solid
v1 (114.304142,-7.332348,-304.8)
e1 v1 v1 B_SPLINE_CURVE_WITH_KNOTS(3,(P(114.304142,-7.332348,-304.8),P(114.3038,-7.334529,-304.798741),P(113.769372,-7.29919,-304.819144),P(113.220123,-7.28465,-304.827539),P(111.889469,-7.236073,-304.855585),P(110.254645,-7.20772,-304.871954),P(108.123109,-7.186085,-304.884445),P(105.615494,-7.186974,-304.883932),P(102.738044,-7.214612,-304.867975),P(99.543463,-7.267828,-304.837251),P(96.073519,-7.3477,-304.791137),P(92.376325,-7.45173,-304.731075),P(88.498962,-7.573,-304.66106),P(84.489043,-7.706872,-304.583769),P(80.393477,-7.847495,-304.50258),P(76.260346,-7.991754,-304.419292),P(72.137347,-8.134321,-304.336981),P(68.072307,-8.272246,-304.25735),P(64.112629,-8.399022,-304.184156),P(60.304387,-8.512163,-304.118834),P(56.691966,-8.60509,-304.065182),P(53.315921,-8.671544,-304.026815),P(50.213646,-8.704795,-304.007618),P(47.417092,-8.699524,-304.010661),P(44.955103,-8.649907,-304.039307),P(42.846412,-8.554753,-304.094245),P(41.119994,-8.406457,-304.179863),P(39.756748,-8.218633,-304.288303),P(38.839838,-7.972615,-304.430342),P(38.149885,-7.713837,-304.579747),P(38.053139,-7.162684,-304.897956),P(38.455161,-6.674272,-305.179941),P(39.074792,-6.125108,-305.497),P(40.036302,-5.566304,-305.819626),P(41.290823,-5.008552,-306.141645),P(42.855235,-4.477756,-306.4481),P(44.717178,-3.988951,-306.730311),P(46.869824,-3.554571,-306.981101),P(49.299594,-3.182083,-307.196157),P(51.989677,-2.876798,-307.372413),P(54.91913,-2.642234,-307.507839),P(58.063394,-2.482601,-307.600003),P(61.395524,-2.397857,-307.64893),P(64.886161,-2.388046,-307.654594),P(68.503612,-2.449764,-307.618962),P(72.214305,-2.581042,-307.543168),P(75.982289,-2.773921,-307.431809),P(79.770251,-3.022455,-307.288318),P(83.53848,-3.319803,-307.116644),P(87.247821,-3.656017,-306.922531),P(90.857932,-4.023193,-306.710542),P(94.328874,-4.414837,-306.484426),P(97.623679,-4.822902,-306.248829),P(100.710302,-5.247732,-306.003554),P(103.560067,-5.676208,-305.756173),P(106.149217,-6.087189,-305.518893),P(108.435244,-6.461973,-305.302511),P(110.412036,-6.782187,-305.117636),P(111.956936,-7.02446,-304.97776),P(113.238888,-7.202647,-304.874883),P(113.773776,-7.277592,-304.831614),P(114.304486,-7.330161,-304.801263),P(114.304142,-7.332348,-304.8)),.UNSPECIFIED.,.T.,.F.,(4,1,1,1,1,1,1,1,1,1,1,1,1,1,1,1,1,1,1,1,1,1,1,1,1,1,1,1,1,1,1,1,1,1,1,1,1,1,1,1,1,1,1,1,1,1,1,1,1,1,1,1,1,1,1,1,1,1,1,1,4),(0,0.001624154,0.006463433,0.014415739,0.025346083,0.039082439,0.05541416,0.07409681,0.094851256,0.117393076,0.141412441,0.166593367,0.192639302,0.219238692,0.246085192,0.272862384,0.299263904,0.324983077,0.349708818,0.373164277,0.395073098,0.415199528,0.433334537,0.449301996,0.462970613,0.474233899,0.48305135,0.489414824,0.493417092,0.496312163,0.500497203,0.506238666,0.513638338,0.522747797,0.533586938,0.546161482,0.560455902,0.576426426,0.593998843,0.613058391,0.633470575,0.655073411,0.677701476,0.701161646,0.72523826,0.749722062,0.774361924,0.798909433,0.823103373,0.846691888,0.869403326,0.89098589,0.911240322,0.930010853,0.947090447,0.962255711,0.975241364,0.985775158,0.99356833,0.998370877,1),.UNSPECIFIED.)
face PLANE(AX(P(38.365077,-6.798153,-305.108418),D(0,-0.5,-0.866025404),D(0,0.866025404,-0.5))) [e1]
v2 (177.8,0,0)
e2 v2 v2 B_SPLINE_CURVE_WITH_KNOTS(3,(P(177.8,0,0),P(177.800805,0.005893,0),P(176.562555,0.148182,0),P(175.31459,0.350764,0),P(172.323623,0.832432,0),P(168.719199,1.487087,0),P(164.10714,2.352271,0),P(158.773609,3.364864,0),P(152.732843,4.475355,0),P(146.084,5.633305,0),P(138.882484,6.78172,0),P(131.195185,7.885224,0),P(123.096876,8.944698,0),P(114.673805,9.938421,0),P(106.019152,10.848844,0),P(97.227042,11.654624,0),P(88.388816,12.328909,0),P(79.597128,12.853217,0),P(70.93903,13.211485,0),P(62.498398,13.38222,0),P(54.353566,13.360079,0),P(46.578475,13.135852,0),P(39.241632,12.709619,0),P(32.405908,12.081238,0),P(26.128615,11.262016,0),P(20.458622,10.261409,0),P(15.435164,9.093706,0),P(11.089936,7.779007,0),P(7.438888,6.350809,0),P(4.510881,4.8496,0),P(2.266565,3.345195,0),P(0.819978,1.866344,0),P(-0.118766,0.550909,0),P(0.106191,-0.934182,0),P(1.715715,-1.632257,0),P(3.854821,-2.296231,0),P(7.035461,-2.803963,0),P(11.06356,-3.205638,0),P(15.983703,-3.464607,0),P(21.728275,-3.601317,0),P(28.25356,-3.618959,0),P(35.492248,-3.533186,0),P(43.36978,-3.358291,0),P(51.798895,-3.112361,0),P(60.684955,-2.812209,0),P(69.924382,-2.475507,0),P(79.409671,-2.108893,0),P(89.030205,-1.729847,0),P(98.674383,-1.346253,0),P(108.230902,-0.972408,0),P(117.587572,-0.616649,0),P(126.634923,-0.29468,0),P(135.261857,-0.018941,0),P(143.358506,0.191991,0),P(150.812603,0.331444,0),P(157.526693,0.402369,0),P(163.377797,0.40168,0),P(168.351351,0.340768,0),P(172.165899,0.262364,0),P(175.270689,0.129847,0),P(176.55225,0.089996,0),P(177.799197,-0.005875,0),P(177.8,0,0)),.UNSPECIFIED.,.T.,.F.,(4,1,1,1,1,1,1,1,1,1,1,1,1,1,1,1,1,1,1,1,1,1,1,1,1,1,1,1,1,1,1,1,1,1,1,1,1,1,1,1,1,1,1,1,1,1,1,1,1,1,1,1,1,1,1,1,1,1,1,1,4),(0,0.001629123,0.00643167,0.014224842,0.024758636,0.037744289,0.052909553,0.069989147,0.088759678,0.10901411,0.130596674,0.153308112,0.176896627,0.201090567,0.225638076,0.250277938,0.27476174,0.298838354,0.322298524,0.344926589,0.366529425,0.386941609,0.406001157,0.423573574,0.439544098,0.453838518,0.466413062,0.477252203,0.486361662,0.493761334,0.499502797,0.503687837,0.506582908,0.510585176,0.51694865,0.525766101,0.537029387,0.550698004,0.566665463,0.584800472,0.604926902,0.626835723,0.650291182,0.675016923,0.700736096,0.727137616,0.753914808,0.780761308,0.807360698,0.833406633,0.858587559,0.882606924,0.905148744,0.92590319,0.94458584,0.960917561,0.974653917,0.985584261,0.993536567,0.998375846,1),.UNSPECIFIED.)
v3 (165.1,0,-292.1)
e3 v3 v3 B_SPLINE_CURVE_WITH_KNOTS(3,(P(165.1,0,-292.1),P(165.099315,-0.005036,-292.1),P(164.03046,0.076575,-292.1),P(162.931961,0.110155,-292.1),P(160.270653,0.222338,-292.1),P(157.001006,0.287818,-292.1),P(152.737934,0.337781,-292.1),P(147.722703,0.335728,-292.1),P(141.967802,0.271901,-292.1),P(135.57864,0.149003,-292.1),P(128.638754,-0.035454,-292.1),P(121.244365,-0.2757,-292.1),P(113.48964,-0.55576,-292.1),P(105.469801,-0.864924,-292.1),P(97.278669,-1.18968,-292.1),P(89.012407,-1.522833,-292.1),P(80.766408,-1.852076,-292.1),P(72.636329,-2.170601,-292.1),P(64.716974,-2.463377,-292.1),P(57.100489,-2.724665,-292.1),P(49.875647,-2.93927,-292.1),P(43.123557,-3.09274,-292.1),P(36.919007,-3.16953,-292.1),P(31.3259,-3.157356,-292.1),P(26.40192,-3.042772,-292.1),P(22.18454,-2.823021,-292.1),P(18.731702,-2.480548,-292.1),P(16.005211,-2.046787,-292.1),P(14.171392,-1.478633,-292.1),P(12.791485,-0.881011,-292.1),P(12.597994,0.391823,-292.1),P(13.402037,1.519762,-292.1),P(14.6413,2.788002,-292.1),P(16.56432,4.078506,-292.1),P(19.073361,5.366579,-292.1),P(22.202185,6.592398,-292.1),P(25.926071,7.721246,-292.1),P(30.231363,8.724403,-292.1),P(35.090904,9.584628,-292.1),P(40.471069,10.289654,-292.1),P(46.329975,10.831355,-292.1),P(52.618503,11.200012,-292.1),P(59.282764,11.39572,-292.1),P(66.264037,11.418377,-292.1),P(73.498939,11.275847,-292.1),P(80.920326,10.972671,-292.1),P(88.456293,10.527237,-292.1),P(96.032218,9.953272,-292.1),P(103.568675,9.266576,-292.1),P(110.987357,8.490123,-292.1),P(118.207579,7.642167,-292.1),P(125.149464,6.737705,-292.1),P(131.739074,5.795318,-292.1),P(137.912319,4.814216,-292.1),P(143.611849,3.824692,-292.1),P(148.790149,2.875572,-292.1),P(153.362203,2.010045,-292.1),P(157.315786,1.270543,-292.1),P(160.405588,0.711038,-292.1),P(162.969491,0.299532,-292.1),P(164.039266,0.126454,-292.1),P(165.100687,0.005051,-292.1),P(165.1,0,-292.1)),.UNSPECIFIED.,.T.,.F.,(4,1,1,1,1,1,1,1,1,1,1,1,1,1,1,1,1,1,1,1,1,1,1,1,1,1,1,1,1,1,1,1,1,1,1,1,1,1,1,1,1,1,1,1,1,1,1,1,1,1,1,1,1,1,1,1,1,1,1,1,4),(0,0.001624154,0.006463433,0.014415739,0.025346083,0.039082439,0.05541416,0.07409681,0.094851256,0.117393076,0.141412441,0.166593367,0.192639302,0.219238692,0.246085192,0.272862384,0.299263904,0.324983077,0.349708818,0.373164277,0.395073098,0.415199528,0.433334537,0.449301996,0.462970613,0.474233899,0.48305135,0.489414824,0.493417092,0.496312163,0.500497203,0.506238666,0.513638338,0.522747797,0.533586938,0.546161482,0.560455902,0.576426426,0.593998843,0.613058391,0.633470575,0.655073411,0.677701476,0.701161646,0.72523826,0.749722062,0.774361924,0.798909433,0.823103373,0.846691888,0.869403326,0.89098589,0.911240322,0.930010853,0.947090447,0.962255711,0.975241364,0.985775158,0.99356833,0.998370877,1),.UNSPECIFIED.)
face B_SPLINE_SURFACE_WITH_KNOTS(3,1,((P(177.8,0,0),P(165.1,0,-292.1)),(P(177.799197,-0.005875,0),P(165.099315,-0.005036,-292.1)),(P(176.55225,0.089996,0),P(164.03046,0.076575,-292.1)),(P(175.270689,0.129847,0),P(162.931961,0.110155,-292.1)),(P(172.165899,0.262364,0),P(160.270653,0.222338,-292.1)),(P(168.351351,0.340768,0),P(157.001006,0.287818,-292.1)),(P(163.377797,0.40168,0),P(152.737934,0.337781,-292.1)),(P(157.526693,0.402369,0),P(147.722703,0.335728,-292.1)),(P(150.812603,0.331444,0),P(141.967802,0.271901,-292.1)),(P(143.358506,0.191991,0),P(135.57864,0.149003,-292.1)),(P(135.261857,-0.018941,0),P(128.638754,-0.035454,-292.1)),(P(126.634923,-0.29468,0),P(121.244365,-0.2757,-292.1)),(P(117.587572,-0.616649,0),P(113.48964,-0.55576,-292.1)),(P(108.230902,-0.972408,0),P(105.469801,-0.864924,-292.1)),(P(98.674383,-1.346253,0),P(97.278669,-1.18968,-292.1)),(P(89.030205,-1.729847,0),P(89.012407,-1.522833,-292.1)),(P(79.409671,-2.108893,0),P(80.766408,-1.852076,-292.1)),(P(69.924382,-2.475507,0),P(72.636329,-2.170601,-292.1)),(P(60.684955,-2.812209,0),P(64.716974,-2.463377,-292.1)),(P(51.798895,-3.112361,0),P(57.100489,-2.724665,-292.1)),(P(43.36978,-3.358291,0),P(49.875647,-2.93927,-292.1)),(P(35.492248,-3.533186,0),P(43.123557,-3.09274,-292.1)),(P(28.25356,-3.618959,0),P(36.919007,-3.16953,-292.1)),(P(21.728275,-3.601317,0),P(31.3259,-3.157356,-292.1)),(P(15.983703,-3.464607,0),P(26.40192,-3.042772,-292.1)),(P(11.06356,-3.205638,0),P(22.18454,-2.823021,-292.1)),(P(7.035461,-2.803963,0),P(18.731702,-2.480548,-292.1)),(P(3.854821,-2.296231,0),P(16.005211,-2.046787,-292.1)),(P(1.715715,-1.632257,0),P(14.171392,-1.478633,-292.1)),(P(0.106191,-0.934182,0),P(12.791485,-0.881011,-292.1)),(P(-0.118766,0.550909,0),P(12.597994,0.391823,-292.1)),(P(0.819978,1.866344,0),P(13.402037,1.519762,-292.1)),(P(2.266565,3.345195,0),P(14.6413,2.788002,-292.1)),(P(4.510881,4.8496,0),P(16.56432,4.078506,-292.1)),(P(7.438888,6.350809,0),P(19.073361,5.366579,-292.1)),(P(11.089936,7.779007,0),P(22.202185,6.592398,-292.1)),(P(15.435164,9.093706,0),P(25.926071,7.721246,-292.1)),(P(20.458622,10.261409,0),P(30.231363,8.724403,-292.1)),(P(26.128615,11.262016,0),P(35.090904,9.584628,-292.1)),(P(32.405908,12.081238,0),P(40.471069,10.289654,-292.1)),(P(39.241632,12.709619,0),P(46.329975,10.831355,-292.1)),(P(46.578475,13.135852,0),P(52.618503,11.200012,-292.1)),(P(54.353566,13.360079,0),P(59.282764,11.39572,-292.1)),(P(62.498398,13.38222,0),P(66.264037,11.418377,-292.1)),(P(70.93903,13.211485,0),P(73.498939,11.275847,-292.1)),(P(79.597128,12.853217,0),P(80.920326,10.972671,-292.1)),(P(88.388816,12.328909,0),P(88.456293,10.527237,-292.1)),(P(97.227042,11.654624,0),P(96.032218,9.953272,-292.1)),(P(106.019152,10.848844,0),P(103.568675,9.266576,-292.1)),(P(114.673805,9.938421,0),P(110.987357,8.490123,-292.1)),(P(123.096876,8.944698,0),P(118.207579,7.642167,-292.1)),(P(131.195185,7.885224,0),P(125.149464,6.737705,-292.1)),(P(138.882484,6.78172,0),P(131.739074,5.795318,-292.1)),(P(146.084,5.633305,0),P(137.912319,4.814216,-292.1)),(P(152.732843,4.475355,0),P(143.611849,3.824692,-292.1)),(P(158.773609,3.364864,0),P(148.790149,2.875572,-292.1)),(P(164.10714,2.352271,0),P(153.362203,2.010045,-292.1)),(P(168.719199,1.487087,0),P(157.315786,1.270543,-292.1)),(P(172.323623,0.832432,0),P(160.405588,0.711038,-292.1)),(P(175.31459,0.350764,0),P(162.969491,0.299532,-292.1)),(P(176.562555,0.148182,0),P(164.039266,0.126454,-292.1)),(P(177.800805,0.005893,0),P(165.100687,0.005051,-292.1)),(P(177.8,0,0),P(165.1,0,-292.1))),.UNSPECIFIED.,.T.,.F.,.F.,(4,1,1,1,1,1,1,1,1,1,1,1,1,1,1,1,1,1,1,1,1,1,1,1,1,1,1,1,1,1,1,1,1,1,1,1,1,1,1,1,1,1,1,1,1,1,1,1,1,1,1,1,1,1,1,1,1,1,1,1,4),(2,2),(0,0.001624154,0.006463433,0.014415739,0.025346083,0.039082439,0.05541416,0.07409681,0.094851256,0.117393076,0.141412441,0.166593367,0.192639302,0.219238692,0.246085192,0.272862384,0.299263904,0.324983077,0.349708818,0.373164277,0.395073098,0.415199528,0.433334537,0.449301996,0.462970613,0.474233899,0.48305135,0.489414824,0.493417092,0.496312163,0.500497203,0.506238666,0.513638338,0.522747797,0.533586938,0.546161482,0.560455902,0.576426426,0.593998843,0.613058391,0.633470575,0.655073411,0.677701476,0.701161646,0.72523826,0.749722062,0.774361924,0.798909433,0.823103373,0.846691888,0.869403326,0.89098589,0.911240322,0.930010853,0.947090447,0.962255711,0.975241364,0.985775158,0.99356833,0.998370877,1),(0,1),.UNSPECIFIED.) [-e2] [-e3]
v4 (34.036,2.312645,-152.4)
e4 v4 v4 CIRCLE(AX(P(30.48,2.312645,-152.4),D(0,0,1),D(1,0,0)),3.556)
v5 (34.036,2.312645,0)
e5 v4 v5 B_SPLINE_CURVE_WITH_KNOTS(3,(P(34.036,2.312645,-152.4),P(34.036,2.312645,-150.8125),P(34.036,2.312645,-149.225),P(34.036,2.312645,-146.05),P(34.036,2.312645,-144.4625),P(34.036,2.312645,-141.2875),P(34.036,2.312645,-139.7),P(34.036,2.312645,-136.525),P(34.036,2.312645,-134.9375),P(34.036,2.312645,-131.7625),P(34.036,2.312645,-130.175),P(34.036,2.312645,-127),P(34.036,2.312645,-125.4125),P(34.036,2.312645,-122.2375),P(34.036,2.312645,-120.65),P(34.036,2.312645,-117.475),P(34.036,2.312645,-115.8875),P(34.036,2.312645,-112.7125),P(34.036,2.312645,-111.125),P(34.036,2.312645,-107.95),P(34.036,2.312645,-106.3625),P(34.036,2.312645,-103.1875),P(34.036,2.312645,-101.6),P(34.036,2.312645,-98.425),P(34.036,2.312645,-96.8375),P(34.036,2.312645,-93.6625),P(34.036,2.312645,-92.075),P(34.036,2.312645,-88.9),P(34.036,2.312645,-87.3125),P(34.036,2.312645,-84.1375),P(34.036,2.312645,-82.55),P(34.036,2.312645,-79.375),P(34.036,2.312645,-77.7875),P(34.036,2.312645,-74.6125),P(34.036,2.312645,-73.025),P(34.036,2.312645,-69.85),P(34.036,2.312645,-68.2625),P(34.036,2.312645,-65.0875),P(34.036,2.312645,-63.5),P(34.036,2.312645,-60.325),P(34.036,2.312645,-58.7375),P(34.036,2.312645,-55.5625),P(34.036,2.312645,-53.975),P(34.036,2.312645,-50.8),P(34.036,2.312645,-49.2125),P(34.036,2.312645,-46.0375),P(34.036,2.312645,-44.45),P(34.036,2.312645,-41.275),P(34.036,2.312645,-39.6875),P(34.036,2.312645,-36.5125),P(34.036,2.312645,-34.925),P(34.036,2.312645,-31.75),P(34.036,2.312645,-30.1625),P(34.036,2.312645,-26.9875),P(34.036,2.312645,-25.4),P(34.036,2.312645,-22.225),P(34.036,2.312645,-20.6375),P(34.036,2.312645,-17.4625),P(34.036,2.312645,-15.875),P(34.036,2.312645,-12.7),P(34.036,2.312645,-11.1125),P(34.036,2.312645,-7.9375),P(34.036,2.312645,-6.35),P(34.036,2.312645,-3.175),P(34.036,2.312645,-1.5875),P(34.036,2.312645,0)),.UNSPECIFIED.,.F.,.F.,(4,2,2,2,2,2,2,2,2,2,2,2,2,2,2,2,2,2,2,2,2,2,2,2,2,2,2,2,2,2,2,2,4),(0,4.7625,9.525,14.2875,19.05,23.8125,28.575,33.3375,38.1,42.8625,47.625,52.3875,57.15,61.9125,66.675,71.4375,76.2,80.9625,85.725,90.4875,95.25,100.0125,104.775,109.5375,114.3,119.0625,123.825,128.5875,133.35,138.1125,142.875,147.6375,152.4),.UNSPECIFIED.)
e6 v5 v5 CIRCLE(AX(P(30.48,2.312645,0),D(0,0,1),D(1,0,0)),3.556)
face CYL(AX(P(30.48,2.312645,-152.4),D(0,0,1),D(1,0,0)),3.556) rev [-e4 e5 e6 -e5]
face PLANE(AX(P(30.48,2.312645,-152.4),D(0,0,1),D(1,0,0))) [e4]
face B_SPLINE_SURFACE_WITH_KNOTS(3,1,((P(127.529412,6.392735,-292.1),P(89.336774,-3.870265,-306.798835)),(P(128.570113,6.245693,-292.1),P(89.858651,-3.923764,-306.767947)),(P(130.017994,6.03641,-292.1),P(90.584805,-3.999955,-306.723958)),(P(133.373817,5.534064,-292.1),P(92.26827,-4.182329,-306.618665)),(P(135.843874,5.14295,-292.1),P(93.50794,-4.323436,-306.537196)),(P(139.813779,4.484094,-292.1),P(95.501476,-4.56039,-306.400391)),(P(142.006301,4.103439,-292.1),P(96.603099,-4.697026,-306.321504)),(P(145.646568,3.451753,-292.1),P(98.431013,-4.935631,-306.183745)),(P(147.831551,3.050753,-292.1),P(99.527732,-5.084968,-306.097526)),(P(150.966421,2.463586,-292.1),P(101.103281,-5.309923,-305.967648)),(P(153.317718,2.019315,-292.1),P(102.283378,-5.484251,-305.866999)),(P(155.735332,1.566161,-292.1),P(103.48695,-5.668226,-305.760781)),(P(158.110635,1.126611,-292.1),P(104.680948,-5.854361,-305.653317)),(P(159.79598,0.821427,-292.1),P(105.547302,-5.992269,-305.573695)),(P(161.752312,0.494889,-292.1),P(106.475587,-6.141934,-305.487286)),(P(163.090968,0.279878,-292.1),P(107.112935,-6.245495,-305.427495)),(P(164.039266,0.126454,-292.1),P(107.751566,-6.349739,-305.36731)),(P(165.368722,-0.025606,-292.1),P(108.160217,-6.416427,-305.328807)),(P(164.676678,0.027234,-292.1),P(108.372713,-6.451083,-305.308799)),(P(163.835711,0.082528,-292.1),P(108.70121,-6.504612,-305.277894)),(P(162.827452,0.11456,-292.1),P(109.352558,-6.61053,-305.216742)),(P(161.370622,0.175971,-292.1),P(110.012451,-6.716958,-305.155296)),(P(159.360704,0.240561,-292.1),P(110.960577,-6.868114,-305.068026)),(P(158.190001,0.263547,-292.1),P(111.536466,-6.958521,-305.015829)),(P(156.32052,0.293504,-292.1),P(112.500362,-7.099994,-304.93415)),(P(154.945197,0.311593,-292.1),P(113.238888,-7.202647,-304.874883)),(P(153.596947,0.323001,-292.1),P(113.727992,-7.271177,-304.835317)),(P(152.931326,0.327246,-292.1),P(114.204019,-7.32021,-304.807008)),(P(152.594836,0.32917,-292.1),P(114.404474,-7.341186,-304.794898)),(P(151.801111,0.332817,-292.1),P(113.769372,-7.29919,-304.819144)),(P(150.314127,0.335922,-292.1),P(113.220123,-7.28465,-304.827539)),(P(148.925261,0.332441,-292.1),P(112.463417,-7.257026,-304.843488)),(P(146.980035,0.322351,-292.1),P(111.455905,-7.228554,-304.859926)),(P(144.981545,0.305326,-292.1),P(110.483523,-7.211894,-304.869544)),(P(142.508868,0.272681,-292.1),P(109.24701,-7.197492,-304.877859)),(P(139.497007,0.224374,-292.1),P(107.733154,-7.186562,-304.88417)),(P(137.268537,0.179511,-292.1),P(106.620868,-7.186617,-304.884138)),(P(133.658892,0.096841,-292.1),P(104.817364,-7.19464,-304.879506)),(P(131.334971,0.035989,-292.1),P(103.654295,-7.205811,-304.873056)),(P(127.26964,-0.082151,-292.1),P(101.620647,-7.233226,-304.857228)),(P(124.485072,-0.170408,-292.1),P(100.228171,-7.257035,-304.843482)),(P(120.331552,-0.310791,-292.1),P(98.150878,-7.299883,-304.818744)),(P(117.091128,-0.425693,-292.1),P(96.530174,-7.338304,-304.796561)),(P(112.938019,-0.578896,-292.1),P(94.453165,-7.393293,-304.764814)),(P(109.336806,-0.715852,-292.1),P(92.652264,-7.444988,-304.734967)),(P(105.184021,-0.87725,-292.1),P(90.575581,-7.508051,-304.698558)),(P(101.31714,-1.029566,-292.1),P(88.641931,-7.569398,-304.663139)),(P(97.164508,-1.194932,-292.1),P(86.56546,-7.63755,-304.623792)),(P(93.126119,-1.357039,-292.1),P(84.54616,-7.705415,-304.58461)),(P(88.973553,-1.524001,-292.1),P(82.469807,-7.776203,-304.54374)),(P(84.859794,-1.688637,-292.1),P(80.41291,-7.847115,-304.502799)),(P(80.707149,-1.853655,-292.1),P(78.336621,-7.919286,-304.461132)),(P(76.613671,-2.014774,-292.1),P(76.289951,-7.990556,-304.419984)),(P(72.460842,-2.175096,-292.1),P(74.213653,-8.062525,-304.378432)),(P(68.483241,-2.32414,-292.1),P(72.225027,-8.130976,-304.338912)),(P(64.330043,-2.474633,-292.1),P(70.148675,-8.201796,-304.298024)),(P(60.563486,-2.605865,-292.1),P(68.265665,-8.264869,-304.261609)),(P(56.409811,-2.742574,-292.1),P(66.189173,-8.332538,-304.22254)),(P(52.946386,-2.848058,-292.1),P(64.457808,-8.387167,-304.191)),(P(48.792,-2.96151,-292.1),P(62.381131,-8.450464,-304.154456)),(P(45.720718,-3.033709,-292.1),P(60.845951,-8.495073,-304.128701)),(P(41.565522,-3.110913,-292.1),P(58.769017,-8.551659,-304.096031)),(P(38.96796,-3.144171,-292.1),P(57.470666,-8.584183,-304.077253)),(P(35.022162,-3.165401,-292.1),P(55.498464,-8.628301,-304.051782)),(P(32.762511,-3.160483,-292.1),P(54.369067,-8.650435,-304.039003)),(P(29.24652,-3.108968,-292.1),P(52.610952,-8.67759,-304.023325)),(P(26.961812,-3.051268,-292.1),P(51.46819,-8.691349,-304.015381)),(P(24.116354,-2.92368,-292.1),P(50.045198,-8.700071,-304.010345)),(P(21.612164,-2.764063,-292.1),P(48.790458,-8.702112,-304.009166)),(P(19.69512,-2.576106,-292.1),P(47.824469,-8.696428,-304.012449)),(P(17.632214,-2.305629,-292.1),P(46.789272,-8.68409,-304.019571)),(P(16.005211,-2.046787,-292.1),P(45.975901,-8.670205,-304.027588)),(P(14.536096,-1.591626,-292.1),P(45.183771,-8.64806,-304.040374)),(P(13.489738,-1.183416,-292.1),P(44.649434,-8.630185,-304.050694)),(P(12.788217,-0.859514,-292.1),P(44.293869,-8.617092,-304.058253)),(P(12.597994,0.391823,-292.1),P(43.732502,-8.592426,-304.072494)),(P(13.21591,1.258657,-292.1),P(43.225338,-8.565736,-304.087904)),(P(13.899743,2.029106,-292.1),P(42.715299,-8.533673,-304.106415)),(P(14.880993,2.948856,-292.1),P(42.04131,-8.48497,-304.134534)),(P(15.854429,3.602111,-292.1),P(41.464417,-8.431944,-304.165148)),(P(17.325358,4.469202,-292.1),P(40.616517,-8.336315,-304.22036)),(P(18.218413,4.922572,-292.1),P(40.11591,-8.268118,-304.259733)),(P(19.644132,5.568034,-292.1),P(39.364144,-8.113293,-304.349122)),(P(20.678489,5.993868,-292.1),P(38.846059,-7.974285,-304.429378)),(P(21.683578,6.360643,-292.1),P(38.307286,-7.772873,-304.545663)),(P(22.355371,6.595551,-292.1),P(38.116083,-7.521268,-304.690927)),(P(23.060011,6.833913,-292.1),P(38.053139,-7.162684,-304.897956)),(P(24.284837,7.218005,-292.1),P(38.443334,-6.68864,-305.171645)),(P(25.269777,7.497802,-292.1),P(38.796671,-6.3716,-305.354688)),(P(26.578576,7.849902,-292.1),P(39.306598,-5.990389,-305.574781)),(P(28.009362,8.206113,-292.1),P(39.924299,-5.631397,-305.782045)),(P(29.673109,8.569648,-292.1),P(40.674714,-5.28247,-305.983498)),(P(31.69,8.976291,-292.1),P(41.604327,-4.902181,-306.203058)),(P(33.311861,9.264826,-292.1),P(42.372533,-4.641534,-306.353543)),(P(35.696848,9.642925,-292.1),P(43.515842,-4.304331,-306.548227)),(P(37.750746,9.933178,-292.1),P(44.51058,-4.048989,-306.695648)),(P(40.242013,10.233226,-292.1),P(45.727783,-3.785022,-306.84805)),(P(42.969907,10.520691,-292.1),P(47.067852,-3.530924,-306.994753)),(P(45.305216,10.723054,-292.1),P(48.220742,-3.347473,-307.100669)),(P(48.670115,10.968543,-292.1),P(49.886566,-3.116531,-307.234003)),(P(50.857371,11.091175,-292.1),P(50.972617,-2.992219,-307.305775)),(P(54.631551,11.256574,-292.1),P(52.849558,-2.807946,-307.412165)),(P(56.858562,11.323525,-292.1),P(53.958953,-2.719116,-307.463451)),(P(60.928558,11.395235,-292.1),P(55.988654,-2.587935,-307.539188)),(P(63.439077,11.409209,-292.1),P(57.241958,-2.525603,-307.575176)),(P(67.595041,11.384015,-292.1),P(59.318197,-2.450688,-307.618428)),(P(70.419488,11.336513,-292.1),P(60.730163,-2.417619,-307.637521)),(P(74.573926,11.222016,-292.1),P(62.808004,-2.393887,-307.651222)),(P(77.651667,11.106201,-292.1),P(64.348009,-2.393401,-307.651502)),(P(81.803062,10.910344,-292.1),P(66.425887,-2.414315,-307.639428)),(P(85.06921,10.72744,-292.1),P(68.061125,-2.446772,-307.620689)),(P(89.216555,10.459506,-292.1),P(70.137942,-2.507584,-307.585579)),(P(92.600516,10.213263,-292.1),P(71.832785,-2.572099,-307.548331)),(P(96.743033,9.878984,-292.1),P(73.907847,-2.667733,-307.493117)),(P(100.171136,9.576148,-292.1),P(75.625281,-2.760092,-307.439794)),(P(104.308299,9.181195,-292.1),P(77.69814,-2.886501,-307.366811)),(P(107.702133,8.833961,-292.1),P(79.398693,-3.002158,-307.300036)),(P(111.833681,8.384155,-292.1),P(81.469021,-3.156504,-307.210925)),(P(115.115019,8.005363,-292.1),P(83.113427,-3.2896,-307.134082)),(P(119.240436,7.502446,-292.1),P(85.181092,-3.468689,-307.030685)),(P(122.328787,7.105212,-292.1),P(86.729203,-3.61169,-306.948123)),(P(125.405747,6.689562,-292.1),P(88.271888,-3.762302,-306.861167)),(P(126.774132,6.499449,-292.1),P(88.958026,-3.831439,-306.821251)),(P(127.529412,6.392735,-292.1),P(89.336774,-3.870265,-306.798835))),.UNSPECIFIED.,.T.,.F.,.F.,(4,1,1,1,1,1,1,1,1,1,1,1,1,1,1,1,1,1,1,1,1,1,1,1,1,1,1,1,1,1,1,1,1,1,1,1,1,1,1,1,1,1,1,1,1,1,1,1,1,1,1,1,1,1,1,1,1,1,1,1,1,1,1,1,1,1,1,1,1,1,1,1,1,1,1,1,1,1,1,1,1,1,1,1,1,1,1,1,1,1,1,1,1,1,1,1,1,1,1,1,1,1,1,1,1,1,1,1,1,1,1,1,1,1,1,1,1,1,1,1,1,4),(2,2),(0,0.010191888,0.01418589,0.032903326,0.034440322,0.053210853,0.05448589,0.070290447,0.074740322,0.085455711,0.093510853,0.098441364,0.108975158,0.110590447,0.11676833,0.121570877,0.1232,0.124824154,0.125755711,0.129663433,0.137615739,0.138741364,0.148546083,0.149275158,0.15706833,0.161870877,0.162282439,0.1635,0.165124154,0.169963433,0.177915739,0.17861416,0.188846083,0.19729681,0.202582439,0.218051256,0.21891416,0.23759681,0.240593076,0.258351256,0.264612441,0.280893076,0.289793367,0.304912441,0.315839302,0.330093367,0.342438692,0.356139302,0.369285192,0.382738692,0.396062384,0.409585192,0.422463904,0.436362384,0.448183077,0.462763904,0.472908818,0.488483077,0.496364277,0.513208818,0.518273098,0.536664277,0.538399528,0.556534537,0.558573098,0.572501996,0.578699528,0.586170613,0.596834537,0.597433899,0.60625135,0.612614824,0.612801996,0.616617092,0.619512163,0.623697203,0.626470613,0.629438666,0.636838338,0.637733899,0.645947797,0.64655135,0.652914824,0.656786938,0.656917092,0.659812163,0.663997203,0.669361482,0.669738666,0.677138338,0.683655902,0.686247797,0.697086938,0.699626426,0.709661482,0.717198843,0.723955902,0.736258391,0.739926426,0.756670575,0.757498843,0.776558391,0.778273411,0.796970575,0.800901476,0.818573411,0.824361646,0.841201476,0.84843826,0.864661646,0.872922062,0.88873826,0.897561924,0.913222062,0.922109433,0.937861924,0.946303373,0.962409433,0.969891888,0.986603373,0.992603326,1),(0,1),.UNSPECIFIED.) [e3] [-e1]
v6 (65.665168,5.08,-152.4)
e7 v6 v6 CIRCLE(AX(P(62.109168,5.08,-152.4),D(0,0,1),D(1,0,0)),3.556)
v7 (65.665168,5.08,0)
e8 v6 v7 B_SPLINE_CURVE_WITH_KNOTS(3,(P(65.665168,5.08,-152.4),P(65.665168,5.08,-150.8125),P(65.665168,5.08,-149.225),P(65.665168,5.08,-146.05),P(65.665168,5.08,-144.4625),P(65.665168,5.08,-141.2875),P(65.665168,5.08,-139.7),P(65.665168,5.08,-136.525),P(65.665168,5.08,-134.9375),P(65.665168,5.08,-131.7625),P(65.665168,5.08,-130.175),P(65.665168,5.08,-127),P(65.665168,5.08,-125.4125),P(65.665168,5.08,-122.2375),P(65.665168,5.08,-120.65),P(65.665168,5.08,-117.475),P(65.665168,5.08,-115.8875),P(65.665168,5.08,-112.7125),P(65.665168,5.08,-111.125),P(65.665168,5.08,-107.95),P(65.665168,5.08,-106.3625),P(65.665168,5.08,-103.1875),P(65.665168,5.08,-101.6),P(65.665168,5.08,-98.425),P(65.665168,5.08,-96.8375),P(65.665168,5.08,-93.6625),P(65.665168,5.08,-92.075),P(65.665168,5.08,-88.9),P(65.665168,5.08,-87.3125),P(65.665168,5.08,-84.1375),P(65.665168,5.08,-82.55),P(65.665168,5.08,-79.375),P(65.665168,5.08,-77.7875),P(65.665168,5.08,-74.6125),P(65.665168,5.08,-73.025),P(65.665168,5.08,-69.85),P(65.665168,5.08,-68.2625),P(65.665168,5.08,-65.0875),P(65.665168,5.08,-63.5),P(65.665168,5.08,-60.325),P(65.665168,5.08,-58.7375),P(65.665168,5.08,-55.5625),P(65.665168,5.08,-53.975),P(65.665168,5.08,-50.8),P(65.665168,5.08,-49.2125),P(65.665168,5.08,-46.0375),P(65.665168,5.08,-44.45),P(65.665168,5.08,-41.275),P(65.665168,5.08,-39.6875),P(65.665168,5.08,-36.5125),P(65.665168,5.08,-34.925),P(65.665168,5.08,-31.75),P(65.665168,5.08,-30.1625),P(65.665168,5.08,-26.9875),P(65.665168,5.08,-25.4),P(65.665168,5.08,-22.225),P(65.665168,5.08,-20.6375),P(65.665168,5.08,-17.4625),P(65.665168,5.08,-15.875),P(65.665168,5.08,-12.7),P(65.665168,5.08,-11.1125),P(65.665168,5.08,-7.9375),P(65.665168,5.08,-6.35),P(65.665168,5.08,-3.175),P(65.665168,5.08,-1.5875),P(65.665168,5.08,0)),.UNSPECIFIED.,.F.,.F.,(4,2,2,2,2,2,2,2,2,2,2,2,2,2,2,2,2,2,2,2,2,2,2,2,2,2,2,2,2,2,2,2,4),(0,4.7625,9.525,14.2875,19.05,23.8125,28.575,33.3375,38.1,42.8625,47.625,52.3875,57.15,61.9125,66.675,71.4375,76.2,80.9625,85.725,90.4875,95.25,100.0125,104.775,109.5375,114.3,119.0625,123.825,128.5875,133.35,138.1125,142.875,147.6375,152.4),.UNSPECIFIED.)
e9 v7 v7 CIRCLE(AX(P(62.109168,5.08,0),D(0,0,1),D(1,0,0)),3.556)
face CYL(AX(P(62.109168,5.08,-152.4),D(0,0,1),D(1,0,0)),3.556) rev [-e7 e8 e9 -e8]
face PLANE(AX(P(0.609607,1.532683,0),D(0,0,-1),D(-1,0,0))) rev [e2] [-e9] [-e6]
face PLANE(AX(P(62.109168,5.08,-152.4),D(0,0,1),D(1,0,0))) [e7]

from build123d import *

# Parameters (mm, degrees)
SKETCH9_R          = 3.556
CUT_EXTRUDE2_DEPTH = 152.4


with BuildPart() as part:
    # Sketch2 → Loft1 section 0
    with BuildSketch(Plane.XY):
        with BuildLine():
            add(Edge.make_bspline(
                [(177.8, 0), (177.800804993, 0.005892616), (176.562555188, 0.148181981), (175.314589905, 0.350764396), (172.323623492, 0.832431756), (168.719198756, 1.487087289), (164.107139704, 2.352270631), (158.773609223, 3.364863695), (152.732842851, 4.475355312), (146.083999505, 5.63330484), (138.882483554, 6.781719749), (131.195184548, 7.885223856), (123.096875712, 8.944697907), (114.673804705, 9.938420976), (106.019152482, 10.848844225), (97.227041943, 11.654623945), (88.388816224, 12.328908821), (79.59712844, 12.853216726), (70.939030395, 13.211485197), (62.498398084, 13.382219859), (54.353565535, 13.360079226), (46.578474705, 13.135851745), (39.241632097, 12.709619296), (32.405908321, 12.081237839), (26.128615202, 11.262016007), (20.45862204, 10.261409284), (15.435164424, 9.093705947), (11.089936491, 7.779007433), (7.438887895, 6.350809058), (4.510881143, 4.849599711), (2.266564545, 3.345194547), (0.819977588, 1.866343846), (-0.118765985, 0.550909192), (0.106191128, -0.934182278), (1.715714837, -1.632257341), (3.854821006, -2.296231342), (7.035460873, -2.803962828), (11.063560376, -3.205637863), (15.983702933, -3.464607091), (21.728274929, -3.601316803), (28.25355977, -3.618958746), (35.49224838, -3.533186181), (43.369780353, -3.358290712), (51.798894766, -3.112360998), (60.684955304, -2.812208729), (69.924382003, -2.475506797), (79.409671047, -2.108893238), (89.030204618, -1.729847377), (98.674382872, -1.346253068), (108.230902118, -0.972408129), (117.587571848, -0.616648845), (126.634923272, -0.294680131), (135.261857466, -0.018940801), (143.358505551, 0.19199071), (150.812603372, 0.33144352), (157.526693264, 0.402369346), (163.377796906, 0.401680466), (168.351350733, 0.340767754), (172.165898878, 0.2623643), (175.270689088, 0.129847323), (176.552249869, 0.089995509), (177.799197462, -0.005874644), (177.8, 0)],
                knots=[0, 0, 0, 0, 0.001629123, 0.00643167, 0.014224842, 0.024758636, 0.037744289, 0.052909553, 0.069989147, 0.088759678, 0.10901411, 0.130596674, 0.153308112, 0.176896627, 0.201090567, 0.225638076, 0.250277938, 0.27476174, 0.298838354, 0.322298524, 0.344926589, 0.366529425, 0.386941609, 0.406001157, 0.423573574, 0.439544098, 0.453838518, 0.466413062, 0.477252203, 0.486361662, 0.493761334, 0.499502797, 0.503687837, 0.506582908, 0.510585176, 0.51694865, 0.525766101, 0.537029387, 0.550698004, 0.566665463, 0.584800472, 0.604926902, 0.626835723, 0.650291182, 0.675016923, 0.700736096, 0.727137616, 0.753914808, 0.780761308, 0.807360698, 0.833406633, 0.858587559, 0.882606924, 0.905148744, 0.92590319, 0.94458584, 0.960917561, 0.974653917, 0.985584261, 0.993536567, 0.998375846, 1, 1, 1, 1], degree=3))
        make_face()
    # Sketch4 → Loft1 section 1
    with BuildSketch(Plane.XY.offset(-292.1)):
        with BuildLine():
            add(Edge.make_bspline(
                [(165.1, 0), (165.100687331, 0.005051176), (164.039266362, 0.126454007), (162.969490602, 0.299532191), (160.405588193, 0.711038478), (157.315786354, 1.270543137), (153.362203079, 2.010044899), (148.790149293, 2.875571851), (143.61184925, 3.824692292), (137.912319076, 4.814216199), (131.739073964, 5.795317876), (125.149463782, 6.737705112), (118.207579452, 7.642166613), (110.987357329, 8.490123416), (103.568674712, 9.266575763), (96.032217992, 9.953271578), (88.456293396, 10.527236722), (80.920326208, 10.972671238), (73.498939496, 11.275846636), (66.264036663, 11.418377065), (59.282763554, 11.395719503), (52.618503136, 11.200011741), (46.329975214, 10.831354915), (40.471068932, 10.289653967), (35.090903589, 9.584627902), (30.231362874, 8.724403499), (25.926070826, 7.721245573), (22.202184759, 6.592398246), (19.073360667, 5.366578983), (16.564319543, 4.07850558), (14.641299833, 2.788001801), (13.402036652, 1.519762259), (12.597993847, 0.391823024), (12.791485149, -0.881010533), (14.171391913, -1.478633229), (16.005210966, -2.046787184), (18.731702351, -2.480548448), (22.184539593, -2.823021322), (26.40192048, -3.042771936), (31.325899738, -3.157356225), (36.919007455, -3.169529726), (43.123557224, -3.092739923), (49.8756466, -2.939270448), (57.100488701, -2.724665286), (64.716974303, -2.463377211), (72.636328589, -2.170601208), (80.766408454, -1.852075593), (89.012406552, -1.522832619), (97.278669459, -1.189680292), (105.4698005, -0.864924171), (113.489640174, -0.555760329), (121.244365211, -0.275699576), (128.63875361, -0.035453946), (135.578640463, 0.149002554), (141.967802395, 0.271901306), (147.722702953, 0.335728318), (152.73793357, 0.337781413), (157.00100605, 0.287817611), (160.270653265, 0.222338104), (162.931961152, 0.110154917), (164.030459523, 0.076575246), (165.099314765, -0.00503577), (165.1, 0)],
                knots=[0, 0, 0, 0, 0.001629123, 0.00643167, 0.014224842, 0.024758636, 0.037744289, 0.052909553, 0.069989147, 0.088759678, 0.10901411, 0.130596674, 0.153308112, 0.176896627, 0.201090567, 0.225638076, 0.250277938, 0.27476174, 0.298838354, 0.322298524, 0.344926589, 0.366529425, 0.386941609, 0.406001157, 0.423573574, 0.439544098, 0.453838518, 0.466413062, 0.477252203, 0.486361662, 0.493761334, 0.499502797, 0.503687837, 0.506582908, 0.510585176, 0.51694865, 0.525766101, 0.537029387, 0.550698004, 0.566665463, 0.584800472, 0.604926902, 0.626835723, 0.650291182, 0.675016923, 0.700736096, 0.727137616, 0.753914808, 0.780761308, 0.807360698, 0.833406633, 0.858587559, 0.882606924, 0.905148744, 0.92590319, 0.94458584, 0.960917561, 0.974653917, 0.985584261, 0.993536567, 0.998375846, 1, 1, 1, 1], degree=3))
        make_face()
    loft()

    # Loft2: read off the stored shape, not the designer's step
    # Loft2: loft between two sections, ruled curve by curve
    loft2_from = [
        Edge.make_bspline([(127.529412001, 6.392734945, -292.1), (128.570113006, 6.245692912, -292.1), (130.017993587, 6.036410006, -292.1), (133.373817125, 5.53406383, -292.1), (135.843873947, 5.142950106, -292.1), (139.813779419, 4.484094169, -292.1), (142.006301398, 4.103439476, -292.1), (145.646567902, 3.451752708, -292.1), (147.831550805, 3.050753426, -292.1), (150.966421198, 2.463585886, -292.1), (153.317717825, 2.019314918, -292.1), (155.73533208, 1.566160717, -292.1), (158.110634972, 1.12661109, -292.1), (159.795979791, 0.821427027, -292.1), (161.752311875, 0.494889353, -292.1), (163.090968025, 0.279878453, -292.1), (164.039266362, 0.126454007, -292.1), (165.368722075, -0.025606006, -292.1), (164.676677892, 0.027234104, -292.1), (163.835710949, 0.082528457, -292.1), (162.827451903, 0.114560338, -292.1), (161.370621848, 0.175970684, -292.1), (159.360704326, 0.240561174, -292.1), (158.190001455, 0.263546684, -292.1), (156.32051985, 0.293503744, -292.1), (154.94519653, 0.311593267, -292.1), (153.596946597, 0.323001044, -292.1), (152.931326163, 0.327245636, -292.1), (152.594836094, 0.329170406, -292.1), (151.801110633, 0.332816555, -292.1), (150.314126856, 0.335922105, -292.1), (148.92526074, 0.332440528, -292.1), (146.980034988, 0.322351399, -292.1), (144.981545121, 0.305326418, -292.1), (142.508867797, 0.27268114, -292.1), (139.497007085, 0.224374312, -292.1), (137.268536857, 0.179510549, -292.1), (133.658891831, 0.096841465, -292.1), (131.334971329, 0.03598862, -292.1), (127.269640288, -0.082150664, -292.1), (124.485072498, -0.170408141, -292.1), (120.331551632, -0.310790588, -292.1), (117.091128073, -0.425693124, -292.1), (112.938018916, -0.578895871, -292.1), (109.336805726, -0.715851591, -292.1), (105.184021161, -0.87724969, -292.1), (101.317139745, -1.029565903, -292.1), (97.164508416, -1.194932279, -292.1), (93.126119037, -1.357039091, -292.1), (88.973552656, -1.52400062, -292.1), (84.859793671, -1.688636516, -292.1), (80.707149219, -1.853654836, -292.1), (76.613670777, -2.014774281, -292.1), (72.460842294, -2.175096296, -292.1), (68.483240922, -2.324139535, -292.1), (64.330042745, -2.474633272, -292.1), (60.563485534, -2.605865117, -292.1), (56.409811017, -2.742574301, -292.1), (52.946386144, -2.848057859, -292.1), (48.792000114, -2.961509921, -292.1), (45.720718349, -3.033708573, -292.1), (41.565522095, -3.110912786, -292.1), (38.967960177, -3.144171129, -292.1), (35.022161918, -3.165401207, -292.1), (32.762510624, -3.160483035, -292.1), (29.246519696, -3.108967662, -292.1), (26.961811518, -3.051267606, -292.1), (24.116353986, -2.923680335, -292.1), (21.612164399, -2.764063326, -292.1), (19.695120014, -2.576105925, -292.1), (17.632214194, -2.305629365, -292.1), (16.005210966, -2.046787184, -292.1), (14.536096394, -1.591625998, -292.1), (13.48973838, -1.183416456, -292.1), (12.788217253, -0.859513511, -292.1), (12.597993847, 0.391823024, -292.1), (13.215909605, 1.258656759, -292.1), (13.899743176, 2.029106121, -292.1), (14.880993271, 2.948855736, -292.1), (15.854428945, 3.602110827, -292.1), (17.325357793, 4.469201897, -292.1), (18.218413154, 4.922571583, -292.1), (19.644131577, 5.568034386, -292.1), (20.678489023, 5.99386834, -292.1), (21.683577831, 6.360642649, -292.1), (22.355370953, 6.59555106, -292.1), (23.060010811, 6.833913064, -292.1), (24.284837079, 7.218005313, -292.1), (25.269776614, 7.497802456, -292.1), (26.578575721, 7.849902155, -292.1), (28.009361762, 8.20611316, -292.1), (29.673108729, 8.569648308, -292.1), (31.689999602, 8.976291484, -292.1), (33.311861148, 9.264825728, -292.1), (35.696847934, 9.642924724, -292.1), (37.750745846, 9.933178179, -292.1), (40.242013302, 10.233225884, -292.1), (42.969907499, 10.520690812, -292.1), (45.305216257, 10.723054098, -292.1), (48.670115232, 10.968542601, -292.1), (50.857371268, 11.091174575, -292.1), (54.63155066, 11.256573884, -292.1), (56.858561827, 11.323525246, -292.1), (60.928558307, 11.395234947, -292.1), (63.439076997, 11.409208723, -292.1), (67.595040505, 11.384014858, -292.1), (70.419487522, 11.33651305, -292.1), (74.573926046, 11.222016017, -292.1), (77.651667215, 11.106201133, -292.1), (81.803062082, 10.910343857, -292.1), (85.069210428, 10.727439778, -292.1), (89.216555225, 10.459505848, -292.1), (92.600516312, 10.21326323, -292.1), (96.743033331, 9.878983746, -292.1), (100.171135676, 9.576147744, -292.1), (104.308299388, 9.181195148, -292.1), (107.702133239, 8.833960737, -292.1), (111.833680765, 8.384154839, -292.1), (115.115019167, 8.005362854, -292.1), (119.240435787, 7.502446055, -292.1), (122.328786982, 7.105212471, -292.1), (125.405747121, 6.689562378, -292.1), (126.774132281, 6.499449424, -292.1), (127.529412001, 6.392734945, -292.1)], [0, 0, 0, 0, 0.010191888, 0.01418589, 0.032903326, 0.034440322, 0.053210853, 0.05448589, 0.070290447, 0.074740322, 0.085455711, 0.093510853, 0.098441364, 0.108975158, 0.110590447, 0.11676833, 0.121570877, 0.1232, 0.124824154, 0.125755711, 0.129663433, 0.137615739, 0.138741364, 0.148546083, 0.149275158, 0.15706833, 0.161870877, 0.162282439, 0.1635, 0.165124154, 0.169963433, 0.177915739, 0.17861416, 0.188846083, 0.19729681, 0.202582439, 0.218051256, 0.21891416, 0.23759681, 0.240593076, 0.258351256, 0.264612441, 0.280893076, 0.289793367, 0.304912441, 0.315839302, 0.330093367, 0.342438692, 0.356139302, 0.369285192, 0.382738692, 0.396062384, 0.409585192, 0.422463904, 0.436362384, 0.448183077, 0.462763904, 0.472908818, 0.488483077, 0.496364277, 0.513208818, 0.518273098, 0.536664277, 0.538399528, 0.556534537, 0.558573098, 0.572501996, 0.578699528, 0.586170613, 0.596834537, 0.597433899, 0.60625135, 0.612614824, 0.612801996, 0.616617092, 0.619512163, 0.623697203, 0.626470613, 0.629438666, 0.636838338, 0.637733899, 0.645947797, 0.64655135, 0.652914824, 0.656786938, 0.656917092, 0.659812163, 0.663997203, 0.669361482, 0.669738666, 0.677138338, 0.683655902, 0.686247797, 0.697086938, 0.699626426, 0.709661482, 0.717198843, 0.723955902, 0.736258391, 0.739926426, 0.756670575, 0.757498843, 0.776558391, 0.778273411, 0.796970575, 0.800901476, 0.818573411, 0.824361646, 0.841201476, 0.84843826, 0.864661646, 0.872922062, 0.88873826, 0.897561924, 0.913222062, 0.922109433, 0.937861924, 0.946303373, 0.962409433, 0.969891888, 0.986603373, 0.992603326, 1, 1, 1, 1], 3),
    ]
    loft2_to = [
        Edge.make_bspline([(89.336773533, -3.870265327, -306.798834605), (89.858650748, -3.923763997, -306.767947134), (90.584805372, -3.999954826, -306.723958338), (92.268270456, -4.182328559, -306.618664814), (93.507940106, -4.323436028, -306.537196379), (95.501475867, -4.560389702, -306.400391111), (96.60309869, -4.697025749, -306.321504253), (98.431013113, -4.935631349, -306.183745245), (99.527732109, -5.084967826, -306.09752579), (101.103281047, -5.309922742, -305.967648009), (102.283377577, -5.484251448, -305.866999283), (103.486950216, -5.668226465, -305.760781258), (104.680947712, -5.854360746, -305.65331658), (105.547301592, -5.992269075, -305.57369517), (106.47558657, -6.141933725, -305.487286244), (107.112935124, -6.245495312, -305.427494934), (107.751566426, -6.349738932, -305.367309852), (108.160217402, -6.416427305, -305.328807301), (108.372712686, -6.451083462, -305.30879856), (108.701210397, -6.504612068, -305.277893805), (109.35255808, -6.610530068, -305.216742019), (110.012450932, -6.716957554, -305.155296081), (110.960577187, -6.86811445, -305.068025607), (111.536466074, -6.958521222, -305.015829233), (112.500362103, -7.099994298, -304.934149714), (113.238887631, -7.202647175, -304.874883048), (113.727992311, -7.27117738, -304.835317116), (114.204018683, -7.320209511, -304.807008401), (114.404473512, -7.341185947, -304.794897651), (113.769372091, -7.299190365, -304.819143811), (113.220122906, -7.28464994, -304.827538729), (112.463416759, -7.257025687, -304.843487599), (111.455905417, -7.228553714, -304.859925901), (110.483523217, -7.2118945, -304.869544102), (109.247010088, -7.197492302, -304.877859215), (107.733153682, -7.186561838, -304.884169922), (106.62086813, -7.186617361, -304.884137866), (104.81736404, -7.194639828, -304.879506092), (103.654295351, -7.205811102, -304.873056354), (101.620646558, -7.233225785, -304.857228479), (100.228171042, -7.257035157, -304.843482132), (98.150877959, -7.299883273, -304.81874376), (96.530174337, -7.33830445, -304.796561283), (94.453165492, -7.393292956, -304.764813655), (92.652263868, -7.444988169, -304.73496741), (90.575580986, -7.508050589, -304.698558305), (88.641930878, -7.569397879, -304.66313943), (86.565459804, -7.637550021, -304.623791773), (84.546160008, -7.705414712, -304.584610075), (82.469807437, -7.776203135, -304.54374036), (80.412909986, -7.847114996, -304.502799378), (78.336620817, -7.9192858, -304.461131545), (76.289951343, -7.990555781, -304.419983802), (74.213652997, -8.062525482, -304.378432076), (72.225027193, -8.130976448, -304.338911892), (70.148675463, -8.201795714, -304.29802437), (68.265664858, -8.264868698, -304.261609166), (66.189173315, -8.332537995, -304.222540279), (64.457808482, -8.387167154, -304.191000119), (62.381131065, -8.450464023, -304.154455655), (60.845951043, -8.495072589, -304.128700887), (58.769016908, -8.551659306, -304.096030531), (57.470665599, -8.584182763, -304.077253104), (55.49846357, -8.628300593, -304.051781663), (54.369066778, -8.650434739, -304.039002508), (52.61095156, -8.677589734, -304.023324565), (51.468189929, -8.691348533, -304.015380918), (50.0451975, -8.700070756, -304.01034514), (48.7904577, -8.702112453, -304.009166366), (47.824468886, -8.69642752, -304.012448564), (46.789271753, -8.684090294, -304.019571465), (45.975901498, -8.67020454, -304.027588408), (45.18377081, -8.648059877, -304.040373635), (44.649434369, -8.630185066, -304.050693662), (44.293868862, -8.617091547, -304.058253209), (43.732502378, -8.592426206, -304.07249375), (43.225337864, -8.565735651, -304.08790355), (42.715299062, -8.533672711, -304.106415097), (42.041309856, -8.484969837, -304.134533714), (41.464416637, -8.431944088, -304.165148144), (40.616517178, -8.336315098, -304.220359567), (40.115910369, -8.268117669, -304.259733372), (39.364143681, -8.113292846, -304.349121525), (38.846059336, -7.974284571, -304.42937799), (38.307285836, -7.772872945, -304.545663046), (38.11608258, -7.521267729, -304.690927385), (38.053139254, -7.162684072, -304.897955756), (38.443334044, -6.688640096, -305.171645173), (38.796670528, -6.371600482, -305.35468808), (39.306597626, -5.990388967, -305.574780651), (39.924299143, -5.631396905, -305.782044814), (40.67471387, -5.282469743, -305.983498005), (41.60432726, -4.902181387, -306.20305759), (42.372533423, -4.641533797, -306.353542546), (43.515841893, -4.304330825, -306.548226773), (44.510579595, -4.048989244, -306.695648304), (45.727782996, -3.785022065, -306.848049825), (47.067852048, -3.530924028, -306.994753395), (48.220742366, -3.347472677, -307.100669082), (49.886566206, -3.116530703, -307.234003493), (50.972617167, -2.992219022, -307.305774875), (52.849558169, -2.807946241, -307.412164815), (53.958953161, -2.719116197, -307.463450865), (55.98865409, -2.587934826, -307.539188465), (57.241957783, -2.525602849, -307.575175848), (59.318196776, -2.450688471, -307.618427685), (60.730162989, -2.417618541, -307.637520618), (62.80800394, -2.393887118, -307.651221961), (64.348009401, -2.393401362, -307.651502413), (66.425886648, -2.414315443, -307.639427663), (68.0611247, -2.446771745, -307.620689008), (70.137941574, -2.507583742, -307.585579185), (71.832785067, -2.572099448, -307.548331025), (73.907846918, -2.667732865, -307.493117045), (75.625281039, -2.760091502, -307.439793762), (77.698139868, -2.88650089, -307.366811268), (79.398693421, -3.002158486, -307.300036324), (81.469020844, -3.156504, -307.210924899), (83.113426605, -3.289599906, -307.134081942), (85.181091731, -3.468689337, -307.030684611), (86.729203347, -3.611689748, -306.948123285), (88.271887547, -3.76230201, -306.861167255), (88.958025675, -3.831439132, -306.821250919), (89.336773533, -3.870265327, -306.798834605)], [0, 0, 0, 0, 0.010191888, 0.01418589, 0.032903326, 0.034440322, 0.053210853, 0.05448589, 0.070290447, 0.074740322, 0.085455711, 0.093510853, 0.098441364, 0.108975158, 0.110590447, 0.11676833, 0.121570877, 0.1232, 0.124824154, 0.125755711, 0.129663433, 0.137615739, 0.138741364, 0.148546083, 0.149275158, 0.15706833, 0.161870877, 0.162282439, 0.1635, 0.165124154, 0.169963433, 0.177915739, 0.17861416, 0.188846083, 0.19729681, 0.202582439, 0.218051256, 0.21891416, 0.23759681, 0.240593076, 0.258351256, 0.264612441, 0.280893076, 0.289793367, 0.304912441, 0.315839302, 0.330093367, 0.342438692, 0.356139302, 0.369285192, 0.382738692, 0.396062384, 0.409585192, 0.422463904, 0.436362384, 0.448183077, 0.462763904, 0.472908818, 0.488483077, 0.496364277, 0.513208818, 0.518273098, 0.536664277, 0.538399528, 0.556534537, 0.558573098, 0.572501996, 0.578699528, 0.586170613, 0.596834537, 0.597433899, 0.60625135, 0.612614824, 0.612801996, 0.616617092, 0.619512163, 0.623697203, 0.626470613, 0.629438666, 0.636838338, 0.637733899, 0.645947797, 0.64655135, 0.652914824, 0.656786938, 0.656917092, 0.659812163, 0.663997203, 0.669361482, 0.669738666, 0.677138338, 0.683655902, 0.686247797, 0.697086938, 0.699626426, 0.709661482, 0.717198843, 0.723955902, 0.736258391, 0.739926426, 0.756670575, 0.757498843, 0.776558391, 0.778273411, 0.796970575, 0.800901476, 0.818573411, 0.824361646, 0.841201476, 0.84843826, 0.864661646, 0.872922062, 0.88873826, 0.897561924, 0.913222062, 0.922109433, 0.937861924, 0.946303373, 0.962409433, 0.969891888, 0.986603373, 0.992603326, 1, 1, 1, 1], 3),
    ]
    loft2 = Solid(Shell([*[Face.make_surface_from_curves(loft2_from[k], loft2_to[k]) for k in range(1)], Face(Wire(loft2_from)), Face(Wire(loft2_to))]))
    add(loft2)

    # Sketch9 → Cut-Extrude2 (cut)
    with BuildSketch(Plane.XY):
        with Locations((62.109167659, 5.08)):
            Circle(SKETCH9_R)
        with Locations((30.48, 2.312645085)):
            Circle(SKETCH9_R)
    extrude(amount=-CUT_EXTRUDE2_DEPTH, mode=Mode.SUBTRACT)


solid = part.part
